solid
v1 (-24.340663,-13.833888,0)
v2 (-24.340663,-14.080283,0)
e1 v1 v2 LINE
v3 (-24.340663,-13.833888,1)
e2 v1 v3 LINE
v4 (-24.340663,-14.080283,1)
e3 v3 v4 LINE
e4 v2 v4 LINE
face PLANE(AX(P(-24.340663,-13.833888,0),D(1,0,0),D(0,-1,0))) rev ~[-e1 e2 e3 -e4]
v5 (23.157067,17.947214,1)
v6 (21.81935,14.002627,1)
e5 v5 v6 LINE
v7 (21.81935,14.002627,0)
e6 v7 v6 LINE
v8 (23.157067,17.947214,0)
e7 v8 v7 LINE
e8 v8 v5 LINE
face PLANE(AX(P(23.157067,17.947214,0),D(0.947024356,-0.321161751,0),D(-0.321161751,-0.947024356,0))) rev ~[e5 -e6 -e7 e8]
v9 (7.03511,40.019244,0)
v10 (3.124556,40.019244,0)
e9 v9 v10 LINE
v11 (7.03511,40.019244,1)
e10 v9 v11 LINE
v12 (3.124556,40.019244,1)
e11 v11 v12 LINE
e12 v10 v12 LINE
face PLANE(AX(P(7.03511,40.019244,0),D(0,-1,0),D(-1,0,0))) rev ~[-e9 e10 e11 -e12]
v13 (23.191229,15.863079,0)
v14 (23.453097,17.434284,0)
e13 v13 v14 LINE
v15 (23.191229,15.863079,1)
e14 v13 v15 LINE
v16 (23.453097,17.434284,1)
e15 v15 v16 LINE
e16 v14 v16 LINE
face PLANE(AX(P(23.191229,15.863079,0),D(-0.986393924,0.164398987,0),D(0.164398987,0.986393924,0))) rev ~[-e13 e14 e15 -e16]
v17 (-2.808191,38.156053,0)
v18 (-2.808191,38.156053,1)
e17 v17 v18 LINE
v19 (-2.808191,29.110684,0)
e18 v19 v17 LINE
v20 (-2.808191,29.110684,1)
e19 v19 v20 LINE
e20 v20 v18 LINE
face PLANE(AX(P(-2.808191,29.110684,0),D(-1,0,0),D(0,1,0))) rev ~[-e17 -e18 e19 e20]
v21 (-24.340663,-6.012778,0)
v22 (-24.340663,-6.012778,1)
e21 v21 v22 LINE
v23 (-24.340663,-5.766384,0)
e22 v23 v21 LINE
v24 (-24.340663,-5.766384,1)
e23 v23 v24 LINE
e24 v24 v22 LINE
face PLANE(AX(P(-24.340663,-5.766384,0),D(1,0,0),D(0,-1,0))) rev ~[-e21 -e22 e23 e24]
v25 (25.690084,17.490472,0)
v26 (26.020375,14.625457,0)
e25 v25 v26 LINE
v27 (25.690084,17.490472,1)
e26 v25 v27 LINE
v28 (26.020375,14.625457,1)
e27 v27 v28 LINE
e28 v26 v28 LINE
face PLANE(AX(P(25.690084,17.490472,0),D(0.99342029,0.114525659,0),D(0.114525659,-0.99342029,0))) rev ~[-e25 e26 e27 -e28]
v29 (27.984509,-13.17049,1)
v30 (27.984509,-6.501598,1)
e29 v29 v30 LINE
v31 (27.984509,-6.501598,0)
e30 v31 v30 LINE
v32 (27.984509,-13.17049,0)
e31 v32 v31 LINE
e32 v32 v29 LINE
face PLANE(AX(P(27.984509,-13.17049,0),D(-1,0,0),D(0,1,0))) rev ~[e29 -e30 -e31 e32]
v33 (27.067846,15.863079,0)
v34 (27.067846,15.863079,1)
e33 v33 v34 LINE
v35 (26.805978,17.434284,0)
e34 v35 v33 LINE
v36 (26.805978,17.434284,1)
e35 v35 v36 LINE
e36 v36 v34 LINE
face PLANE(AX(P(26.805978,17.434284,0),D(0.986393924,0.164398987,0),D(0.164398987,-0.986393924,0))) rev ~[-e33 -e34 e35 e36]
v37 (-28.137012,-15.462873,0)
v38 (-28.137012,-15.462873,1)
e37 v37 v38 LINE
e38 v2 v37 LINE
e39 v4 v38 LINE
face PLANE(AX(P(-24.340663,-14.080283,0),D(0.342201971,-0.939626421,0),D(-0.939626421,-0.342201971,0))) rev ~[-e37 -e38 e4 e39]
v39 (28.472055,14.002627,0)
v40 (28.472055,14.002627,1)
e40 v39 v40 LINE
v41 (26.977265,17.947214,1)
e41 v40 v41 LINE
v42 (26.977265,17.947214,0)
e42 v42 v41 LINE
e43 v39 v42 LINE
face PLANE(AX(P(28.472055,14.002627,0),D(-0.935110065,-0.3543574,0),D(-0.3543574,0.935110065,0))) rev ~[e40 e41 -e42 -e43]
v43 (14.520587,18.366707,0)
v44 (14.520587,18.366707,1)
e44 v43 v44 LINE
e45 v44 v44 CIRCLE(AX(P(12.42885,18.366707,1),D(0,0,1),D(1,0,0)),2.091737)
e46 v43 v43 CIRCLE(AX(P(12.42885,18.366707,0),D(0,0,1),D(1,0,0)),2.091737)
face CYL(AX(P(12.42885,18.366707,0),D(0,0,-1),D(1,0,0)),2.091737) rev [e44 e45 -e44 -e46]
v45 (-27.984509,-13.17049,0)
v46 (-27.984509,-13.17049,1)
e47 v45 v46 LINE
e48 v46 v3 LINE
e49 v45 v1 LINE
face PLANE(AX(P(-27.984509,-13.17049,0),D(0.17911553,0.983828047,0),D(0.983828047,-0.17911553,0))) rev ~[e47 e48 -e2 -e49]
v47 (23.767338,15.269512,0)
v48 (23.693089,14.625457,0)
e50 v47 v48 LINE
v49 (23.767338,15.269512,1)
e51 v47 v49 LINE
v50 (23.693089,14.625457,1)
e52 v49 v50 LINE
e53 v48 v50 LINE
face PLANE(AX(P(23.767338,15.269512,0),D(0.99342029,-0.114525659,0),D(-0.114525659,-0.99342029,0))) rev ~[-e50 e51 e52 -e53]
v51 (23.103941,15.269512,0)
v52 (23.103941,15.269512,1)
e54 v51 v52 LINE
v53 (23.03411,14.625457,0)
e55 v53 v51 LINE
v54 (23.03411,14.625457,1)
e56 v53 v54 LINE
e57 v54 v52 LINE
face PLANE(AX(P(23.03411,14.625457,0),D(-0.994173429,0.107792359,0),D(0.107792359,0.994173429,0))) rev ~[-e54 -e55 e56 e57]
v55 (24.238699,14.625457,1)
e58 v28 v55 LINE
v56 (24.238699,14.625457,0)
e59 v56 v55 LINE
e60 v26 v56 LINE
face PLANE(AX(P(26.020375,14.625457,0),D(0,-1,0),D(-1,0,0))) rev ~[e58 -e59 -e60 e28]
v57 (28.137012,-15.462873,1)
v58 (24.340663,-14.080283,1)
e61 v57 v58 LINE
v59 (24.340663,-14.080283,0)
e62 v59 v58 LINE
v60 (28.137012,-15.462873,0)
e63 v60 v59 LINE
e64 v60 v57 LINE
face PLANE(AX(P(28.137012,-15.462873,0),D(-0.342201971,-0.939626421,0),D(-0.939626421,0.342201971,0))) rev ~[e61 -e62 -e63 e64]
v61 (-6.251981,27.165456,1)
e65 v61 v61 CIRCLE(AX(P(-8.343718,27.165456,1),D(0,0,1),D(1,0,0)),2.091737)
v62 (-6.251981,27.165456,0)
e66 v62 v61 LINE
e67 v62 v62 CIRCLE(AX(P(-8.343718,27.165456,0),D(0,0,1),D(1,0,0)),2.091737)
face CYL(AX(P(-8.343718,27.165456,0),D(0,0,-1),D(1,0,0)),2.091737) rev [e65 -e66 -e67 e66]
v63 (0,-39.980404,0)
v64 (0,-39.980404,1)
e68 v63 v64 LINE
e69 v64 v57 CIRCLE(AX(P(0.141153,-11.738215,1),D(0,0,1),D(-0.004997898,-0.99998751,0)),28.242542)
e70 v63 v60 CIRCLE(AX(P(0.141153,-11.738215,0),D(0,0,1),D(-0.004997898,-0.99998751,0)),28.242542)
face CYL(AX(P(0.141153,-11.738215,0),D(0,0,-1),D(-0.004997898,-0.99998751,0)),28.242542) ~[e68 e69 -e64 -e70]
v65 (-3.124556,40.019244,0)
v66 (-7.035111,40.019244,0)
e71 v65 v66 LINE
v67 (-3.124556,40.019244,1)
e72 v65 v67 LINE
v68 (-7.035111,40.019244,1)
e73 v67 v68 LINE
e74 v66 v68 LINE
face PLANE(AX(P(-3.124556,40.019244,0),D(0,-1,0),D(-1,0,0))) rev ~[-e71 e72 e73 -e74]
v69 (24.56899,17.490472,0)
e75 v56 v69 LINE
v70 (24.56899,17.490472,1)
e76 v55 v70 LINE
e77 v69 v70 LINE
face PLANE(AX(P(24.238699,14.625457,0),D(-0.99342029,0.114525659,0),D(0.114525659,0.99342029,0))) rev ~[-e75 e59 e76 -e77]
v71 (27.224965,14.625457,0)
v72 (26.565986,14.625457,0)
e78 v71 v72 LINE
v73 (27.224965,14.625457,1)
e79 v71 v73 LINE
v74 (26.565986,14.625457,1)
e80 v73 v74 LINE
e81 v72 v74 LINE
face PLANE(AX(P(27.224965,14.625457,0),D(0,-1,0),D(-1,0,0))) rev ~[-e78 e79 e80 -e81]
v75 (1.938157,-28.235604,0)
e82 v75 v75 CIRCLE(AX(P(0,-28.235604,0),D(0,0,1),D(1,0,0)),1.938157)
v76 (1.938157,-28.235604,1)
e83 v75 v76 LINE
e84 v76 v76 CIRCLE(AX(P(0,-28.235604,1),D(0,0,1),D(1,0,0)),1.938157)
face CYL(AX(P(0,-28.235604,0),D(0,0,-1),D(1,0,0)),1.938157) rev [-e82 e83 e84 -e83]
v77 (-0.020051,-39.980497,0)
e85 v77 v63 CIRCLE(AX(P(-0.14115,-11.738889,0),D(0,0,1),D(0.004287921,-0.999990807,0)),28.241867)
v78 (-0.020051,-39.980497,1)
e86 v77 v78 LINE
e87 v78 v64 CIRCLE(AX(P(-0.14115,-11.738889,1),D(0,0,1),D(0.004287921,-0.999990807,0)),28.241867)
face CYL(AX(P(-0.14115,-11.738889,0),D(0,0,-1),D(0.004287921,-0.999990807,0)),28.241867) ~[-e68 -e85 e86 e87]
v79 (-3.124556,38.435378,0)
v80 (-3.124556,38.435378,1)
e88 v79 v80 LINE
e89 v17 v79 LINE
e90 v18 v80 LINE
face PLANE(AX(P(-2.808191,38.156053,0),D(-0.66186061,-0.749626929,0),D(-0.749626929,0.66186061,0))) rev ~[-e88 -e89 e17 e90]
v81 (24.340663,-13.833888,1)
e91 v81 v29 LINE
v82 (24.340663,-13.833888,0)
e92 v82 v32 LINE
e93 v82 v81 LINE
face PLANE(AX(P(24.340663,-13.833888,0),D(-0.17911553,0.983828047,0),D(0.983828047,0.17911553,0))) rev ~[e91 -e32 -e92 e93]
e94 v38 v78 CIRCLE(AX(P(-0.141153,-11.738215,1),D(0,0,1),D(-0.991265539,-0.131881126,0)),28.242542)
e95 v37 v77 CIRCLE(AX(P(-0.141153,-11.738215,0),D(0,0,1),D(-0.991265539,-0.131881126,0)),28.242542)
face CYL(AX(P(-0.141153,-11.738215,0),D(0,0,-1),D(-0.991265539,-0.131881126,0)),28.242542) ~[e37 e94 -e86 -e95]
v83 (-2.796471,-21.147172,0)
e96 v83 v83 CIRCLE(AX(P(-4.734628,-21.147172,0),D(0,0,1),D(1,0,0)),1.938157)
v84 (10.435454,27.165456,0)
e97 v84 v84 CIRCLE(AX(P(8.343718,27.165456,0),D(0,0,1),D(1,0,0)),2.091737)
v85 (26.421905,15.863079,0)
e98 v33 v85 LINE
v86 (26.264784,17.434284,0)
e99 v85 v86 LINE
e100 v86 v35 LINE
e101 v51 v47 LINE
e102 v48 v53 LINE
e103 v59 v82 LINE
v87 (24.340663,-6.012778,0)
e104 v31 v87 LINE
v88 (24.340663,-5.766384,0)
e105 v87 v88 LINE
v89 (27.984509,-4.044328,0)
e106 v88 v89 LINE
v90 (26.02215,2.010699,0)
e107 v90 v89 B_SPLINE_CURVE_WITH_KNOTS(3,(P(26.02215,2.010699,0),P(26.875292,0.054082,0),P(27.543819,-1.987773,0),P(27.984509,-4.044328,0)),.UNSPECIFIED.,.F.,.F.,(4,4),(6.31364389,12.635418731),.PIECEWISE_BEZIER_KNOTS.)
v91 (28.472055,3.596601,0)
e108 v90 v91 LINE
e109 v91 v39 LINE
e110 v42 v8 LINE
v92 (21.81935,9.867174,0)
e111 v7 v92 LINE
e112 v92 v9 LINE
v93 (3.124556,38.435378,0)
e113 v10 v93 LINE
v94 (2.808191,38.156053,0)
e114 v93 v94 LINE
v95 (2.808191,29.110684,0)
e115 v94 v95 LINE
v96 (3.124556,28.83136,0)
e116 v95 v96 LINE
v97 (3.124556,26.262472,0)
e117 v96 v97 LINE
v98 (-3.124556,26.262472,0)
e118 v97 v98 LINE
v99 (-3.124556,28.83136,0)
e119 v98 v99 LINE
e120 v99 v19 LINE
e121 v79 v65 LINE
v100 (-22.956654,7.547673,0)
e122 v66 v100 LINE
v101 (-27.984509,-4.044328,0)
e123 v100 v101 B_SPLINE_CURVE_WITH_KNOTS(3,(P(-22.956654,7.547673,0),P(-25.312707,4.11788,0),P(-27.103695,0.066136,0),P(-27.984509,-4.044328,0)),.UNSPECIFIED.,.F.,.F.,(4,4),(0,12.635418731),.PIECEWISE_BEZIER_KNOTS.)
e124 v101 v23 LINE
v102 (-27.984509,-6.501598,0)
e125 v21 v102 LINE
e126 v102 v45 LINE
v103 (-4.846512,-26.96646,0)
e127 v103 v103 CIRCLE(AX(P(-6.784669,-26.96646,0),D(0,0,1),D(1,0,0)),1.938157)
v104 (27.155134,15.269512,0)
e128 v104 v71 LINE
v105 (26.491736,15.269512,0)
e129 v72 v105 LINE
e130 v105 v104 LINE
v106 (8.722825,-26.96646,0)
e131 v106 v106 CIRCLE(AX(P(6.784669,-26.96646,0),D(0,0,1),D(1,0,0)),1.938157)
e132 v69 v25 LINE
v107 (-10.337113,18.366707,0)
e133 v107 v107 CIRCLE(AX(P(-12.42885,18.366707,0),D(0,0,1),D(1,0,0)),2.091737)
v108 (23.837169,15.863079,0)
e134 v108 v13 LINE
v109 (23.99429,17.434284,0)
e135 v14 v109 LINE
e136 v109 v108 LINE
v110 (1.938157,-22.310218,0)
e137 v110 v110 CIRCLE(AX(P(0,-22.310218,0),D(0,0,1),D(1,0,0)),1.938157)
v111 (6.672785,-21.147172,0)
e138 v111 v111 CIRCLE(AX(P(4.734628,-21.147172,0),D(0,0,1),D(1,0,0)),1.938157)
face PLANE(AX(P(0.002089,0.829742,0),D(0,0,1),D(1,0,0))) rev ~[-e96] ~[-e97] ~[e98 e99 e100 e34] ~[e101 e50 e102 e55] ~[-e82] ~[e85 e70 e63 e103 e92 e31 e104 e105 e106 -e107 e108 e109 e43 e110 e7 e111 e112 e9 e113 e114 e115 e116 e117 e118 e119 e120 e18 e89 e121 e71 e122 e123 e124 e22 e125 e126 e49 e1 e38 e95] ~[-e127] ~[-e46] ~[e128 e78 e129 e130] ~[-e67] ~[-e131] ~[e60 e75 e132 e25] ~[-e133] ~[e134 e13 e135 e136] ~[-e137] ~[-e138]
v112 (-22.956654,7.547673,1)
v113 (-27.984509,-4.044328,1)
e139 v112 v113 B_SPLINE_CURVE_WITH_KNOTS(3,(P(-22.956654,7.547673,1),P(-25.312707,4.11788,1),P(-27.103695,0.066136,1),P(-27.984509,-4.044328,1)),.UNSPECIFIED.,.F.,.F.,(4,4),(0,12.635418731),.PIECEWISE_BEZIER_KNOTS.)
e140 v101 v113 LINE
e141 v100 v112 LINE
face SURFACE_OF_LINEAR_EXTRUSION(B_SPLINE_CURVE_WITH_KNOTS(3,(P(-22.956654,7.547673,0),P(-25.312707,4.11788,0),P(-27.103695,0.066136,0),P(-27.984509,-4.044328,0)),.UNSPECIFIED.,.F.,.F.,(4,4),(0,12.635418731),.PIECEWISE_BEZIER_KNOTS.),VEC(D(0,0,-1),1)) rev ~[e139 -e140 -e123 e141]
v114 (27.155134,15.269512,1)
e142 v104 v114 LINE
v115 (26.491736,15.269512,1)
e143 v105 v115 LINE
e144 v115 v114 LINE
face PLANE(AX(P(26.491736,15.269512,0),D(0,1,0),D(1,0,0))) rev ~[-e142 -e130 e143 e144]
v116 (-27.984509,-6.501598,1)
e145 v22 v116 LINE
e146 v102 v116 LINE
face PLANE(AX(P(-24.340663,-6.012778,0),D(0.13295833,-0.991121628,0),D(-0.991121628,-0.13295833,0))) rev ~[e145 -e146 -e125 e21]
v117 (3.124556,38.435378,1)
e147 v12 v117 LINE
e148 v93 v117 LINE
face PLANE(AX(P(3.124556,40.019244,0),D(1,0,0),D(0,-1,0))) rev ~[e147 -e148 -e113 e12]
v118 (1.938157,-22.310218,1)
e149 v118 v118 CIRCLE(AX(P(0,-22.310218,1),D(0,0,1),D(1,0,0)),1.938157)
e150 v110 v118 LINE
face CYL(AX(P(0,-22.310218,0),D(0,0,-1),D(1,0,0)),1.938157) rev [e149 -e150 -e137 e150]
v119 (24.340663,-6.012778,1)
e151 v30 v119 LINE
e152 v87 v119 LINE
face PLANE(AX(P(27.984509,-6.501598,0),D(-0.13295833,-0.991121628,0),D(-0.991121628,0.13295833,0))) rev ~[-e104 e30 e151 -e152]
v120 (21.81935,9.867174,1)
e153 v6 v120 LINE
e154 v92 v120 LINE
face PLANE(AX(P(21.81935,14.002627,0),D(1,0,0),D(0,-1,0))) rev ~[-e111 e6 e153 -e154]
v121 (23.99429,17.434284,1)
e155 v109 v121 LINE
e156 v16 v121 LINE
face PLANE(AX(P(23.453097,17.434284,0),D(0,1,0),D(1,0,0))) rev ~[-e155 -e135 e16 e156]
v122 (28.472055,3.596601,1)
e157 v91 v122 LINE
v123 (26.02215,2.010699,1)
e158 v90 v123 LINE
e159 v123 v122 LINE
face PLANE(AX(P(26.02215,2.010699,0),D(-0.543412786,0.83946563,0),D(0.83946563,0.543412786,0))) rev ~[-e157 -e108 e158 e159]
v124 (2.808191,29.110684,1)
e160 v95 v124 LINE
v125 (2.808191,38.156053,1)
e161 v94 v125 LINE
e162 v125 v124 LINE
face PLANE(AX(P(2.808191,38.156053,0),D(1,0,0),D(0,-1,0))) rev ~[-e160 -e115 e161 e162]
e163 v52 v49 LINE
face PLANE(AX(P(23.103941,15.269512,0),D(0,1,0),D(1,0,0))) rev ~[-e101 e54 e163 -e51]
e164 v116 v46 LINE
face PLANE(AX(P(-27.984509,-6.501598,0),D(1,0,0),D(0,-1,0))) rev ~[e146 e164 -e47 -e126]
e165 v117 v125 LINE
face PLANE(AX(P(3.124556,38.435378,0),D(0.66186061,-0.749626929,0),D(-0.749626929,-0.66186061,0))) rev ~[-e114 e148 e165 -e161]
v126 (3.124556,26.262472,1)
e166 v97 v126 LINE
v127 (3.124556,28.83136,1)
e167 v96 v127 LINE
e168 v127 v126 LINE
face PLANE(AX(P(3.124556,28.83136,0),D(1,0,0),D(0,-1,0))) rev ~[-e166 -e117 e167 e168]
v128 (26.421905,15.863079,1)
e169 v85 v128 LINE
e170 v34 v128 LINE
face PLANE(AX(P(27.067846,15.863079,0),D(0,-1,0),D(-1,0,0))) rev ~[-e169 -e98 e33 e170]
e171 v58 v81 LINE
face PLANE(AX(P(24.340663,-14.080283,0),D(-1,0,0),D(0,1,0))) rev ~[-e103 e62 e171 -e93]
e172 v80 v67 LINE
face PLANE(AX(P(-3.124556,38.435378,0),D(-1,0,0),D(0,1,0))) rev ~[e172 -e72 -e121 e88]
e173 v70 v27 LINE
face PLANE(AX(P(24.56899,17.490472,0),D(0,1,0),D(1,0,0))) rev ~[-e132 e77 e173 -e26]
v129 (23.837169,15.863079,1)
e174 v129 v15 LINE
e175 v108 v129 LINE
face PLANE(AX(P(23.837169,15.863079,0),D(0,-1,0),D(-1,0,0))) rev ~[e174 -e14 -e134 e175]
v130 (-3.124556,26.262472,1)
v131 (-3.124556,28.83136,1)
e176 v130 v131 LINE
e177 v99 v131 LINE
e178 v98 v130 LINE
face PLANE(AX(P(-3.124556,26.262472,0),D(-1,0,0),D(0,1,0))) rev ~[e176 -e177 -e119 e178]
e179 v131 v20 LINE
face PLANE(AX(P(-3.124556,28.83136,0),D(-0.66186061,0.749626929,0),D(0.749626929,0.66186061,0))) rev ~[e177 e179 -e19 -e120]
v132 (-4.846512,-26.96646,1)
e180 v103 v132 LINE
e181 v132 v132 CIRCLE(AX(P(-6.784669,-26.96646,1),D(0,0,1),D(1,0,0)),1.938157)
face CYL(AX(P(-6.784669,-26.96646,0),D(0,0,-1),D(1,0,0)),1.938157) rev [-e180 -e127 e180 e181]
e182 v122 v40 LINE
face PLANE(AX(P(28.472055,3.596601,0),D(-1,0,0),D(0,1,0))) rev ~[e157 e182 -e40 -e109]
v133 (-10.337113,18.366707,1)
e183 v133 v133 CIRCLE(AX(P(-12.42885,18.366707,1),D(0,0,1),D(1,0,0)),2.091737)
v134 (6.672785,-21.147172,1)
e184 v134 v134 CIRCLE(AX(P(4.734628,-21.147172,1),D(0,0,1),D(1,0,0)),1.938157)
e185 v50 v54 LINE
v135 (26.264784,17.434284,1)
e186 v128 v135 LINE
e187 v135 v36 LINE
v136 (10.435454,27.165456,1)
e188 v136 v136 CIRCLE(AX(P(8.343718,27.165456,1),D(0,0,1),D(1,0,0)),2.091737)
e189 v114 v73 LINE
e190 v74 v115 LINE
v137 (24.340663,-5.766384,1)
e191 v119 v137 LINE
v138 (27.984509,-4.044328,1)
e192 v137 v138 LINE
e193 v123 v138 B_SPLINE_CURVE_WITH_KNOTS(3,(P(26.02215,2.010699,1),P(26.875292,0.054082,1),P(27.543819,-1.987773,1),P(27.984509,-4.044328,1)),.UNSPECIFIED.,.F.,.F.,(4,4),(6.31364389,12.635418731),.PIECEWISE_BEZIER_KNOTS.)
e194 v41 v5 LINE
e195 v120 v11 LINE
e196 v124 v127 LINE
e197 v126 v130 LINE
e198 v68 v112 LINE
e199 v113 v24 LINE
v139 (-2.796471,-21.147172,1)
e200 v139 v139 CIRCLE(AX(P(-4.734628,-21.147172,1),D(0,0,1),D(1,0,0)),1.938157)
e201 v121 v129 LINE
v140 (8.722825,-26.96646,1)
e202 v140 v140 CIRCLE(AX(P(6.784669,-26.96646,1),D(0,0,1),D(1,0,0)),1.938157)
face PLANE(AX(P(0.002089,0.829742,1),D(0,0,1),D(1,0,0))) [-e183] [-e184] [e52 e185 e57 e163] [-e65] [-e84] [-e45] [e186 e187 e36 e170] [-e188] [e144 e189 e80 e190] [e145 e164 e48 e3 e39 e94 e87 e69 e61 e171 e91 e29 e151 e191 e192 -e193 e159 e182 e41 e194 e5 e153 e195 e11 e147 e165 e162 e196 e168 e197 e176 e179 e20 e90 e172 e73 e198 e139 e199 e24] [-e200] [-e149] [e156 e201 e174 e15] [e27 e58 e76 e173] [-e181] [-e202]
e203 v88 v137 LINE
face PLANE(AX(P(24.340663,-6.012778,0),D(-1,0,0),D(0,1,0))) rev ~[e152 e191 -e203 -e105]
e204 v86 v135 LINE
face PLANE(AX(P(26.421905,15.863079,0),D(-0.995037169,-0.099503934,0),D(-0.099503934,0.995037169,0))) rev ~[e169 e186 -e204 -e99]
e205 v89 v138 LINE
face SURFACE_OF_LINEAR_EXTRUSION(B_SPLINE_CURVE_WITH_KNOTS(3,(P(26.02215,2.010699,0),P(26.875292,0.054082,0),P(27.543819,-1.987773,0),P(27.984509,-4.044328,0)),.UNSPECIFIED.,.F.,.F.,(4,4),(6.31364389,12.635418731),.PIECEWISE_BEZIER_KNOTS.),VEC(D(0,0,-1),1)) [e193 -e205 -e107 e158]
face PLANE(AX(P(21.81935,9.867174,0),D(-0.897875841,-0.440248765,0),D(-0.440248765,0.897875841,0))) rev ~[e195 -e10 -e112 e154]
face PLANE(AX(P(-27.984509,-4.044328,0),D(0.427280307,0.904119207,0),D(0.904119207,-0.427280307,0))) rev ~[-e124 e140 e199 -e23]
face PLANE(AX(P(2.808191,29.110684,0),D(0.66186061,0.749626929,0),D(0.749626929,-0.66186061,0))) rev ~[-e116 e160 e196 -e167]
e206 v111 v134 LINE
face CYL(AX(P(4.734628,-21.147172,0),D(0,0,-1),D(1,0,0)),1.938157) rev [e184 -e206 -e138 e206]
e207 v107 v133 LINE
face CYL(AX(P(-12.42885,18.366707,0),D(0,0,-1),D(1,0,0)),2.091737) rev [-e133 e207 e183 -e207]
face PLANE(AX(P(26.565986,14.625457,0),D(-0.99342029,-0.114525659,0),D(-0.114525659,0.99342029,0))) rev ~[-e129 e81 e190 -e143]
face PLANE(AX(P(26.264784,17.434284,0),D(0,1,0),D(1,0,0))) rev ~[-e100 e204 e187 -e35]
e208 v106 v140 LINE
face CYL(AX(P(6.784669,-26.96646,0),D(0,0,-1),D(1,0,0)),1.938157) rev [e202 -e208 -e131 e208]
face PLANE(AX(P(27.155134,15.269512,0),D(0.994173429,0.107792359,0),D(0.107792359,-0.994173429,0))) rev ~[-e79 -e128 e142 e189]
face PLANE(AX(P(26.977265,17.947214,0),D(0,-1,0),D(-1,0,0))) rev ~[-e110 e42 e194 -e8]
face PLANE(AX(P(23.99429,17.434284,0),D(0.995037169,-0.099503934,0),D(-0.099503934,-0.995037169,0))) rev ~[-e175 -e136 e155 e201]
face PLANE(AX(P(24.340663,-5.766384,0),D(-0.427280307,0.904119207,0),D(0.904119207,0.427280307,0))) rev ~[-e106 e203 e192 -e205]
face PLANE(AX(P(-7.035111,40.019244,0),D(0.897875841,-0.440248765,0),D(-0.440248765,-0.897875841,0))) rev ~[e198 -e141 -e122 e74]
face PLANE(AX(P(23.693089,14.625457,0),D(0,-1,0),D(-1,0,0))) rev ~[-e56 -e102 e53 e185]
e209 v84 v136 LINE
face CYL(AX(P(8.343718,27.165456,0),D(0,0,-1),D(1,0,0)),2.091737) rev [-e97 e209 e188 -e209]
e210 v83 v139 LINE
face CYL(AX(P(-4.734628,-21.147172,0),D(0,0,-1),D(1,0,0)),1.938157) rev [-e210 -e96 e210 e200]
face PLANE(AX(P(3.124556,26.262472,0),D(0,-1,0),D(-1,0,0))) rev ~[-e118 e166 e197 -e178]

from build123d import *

# Parameters (mm, degrees)
F0_R     = 1.9381566851
F0_R_2   = 2.0917368597
F1_DEPTH = 1


# Not quite as in the source:
# - a feature names something its author has since deleted; it is built from what else it names


with BuildPart() as f1:
    # F0 (on Top) → F1 (new body)
    with BuildSketch(Plane.XY):
        with BuildLine():
            Line((3.1245559464, 26.2624721611), (-1.08e-08, 26.2624721611))
            Line((-1.08e-08, 26.2624721611), (-3.124555968, 26.2624721611))
            Line((-3.124555968, 26.2624721611), (-3.124555968, 28.8313598976))
            Line((-3.124555968, 28.8313598976), (-3.124555968, 38.4353779081))
            Line((-3.124555968, 38.4353779081), (-3.124555968, 40.0192436593))
            Line((-3.124555968, 40.0192436593), (-7.0351105106, 40.0192436593))
            Line((-7.0351105106, 40.0192436593), (-22.9566536529, 7.5476728616))
            add(Edge.make_bspline(
                [(-22.9566536529, 7.5476728616), (-25.3127067939, 4.1178797379), (-27.103694983, 0.0661364302), (-27.9845091561, -4.0443276364)],
                knots=[0, 0, 0, 0, 12.635418731, 12.635418731, 12.635418731, 12.635418731], degree=3))
            Line((-27.9845091561, -4.0443276364), (-24.3406626732, -5.7663835679))
            Line((-24.3406626732, -5.7663835679), (-24.3406626732, -6.0127781864))
            Line((-24.3406626732, -6.0127781864), (-27.9845091561, -6.501597853))
            Line((-27.9845091561, -6.501597853), (-27.9845091561, -13.1704901951))
            Line((-27.9845091561, -13.1704901951), (-24.3406626732, -13.83388813))
            Line((-24.3406626732, -13.83388813), (-24.3406626732, -14.0802827486))
            Line((-24.3406626732, -14.0802827486), (-28.1370117447, -15.4628727929))
            ThreePointArc((-28.1370117447, -15.4628727929), (-18.7026452725, -33.0246464869), (-0.0200514, -39.9804967013))
            ThreePointArc((-0.0200514, -39.9804967013), (-0.0100256971, -39.9804519319), (-1.08e-08, -39.9804036034))
            ThreePointArc((-1.08e-08, -39.9804036034), (18.6950876239, -33.0312342783), (28.1370117231, -15.4628727929))
            Line((28.1370117231, -15.4628727929), (24.3406626516, -14.0802827486))
            Line((24.3406626516, -14.0802827486), (24.3406626516, -13.8338881301))
            Line((24.3406626516, -13.8338881301), (27.9845091345, -13.1704901951))
            Line((27.9845091345, -13.1704901951), (27.9845091345, -6.501597853))
            Line((27.9845091345, -6.501597853), (24.3406626516, -6.0127781865))
            Line((24.3406626516, -6.0127781865), (24.3406626516, -5.7663835679))
            Line((24.3406626516, -5.7663835679), (27.9845091345, -4.0443276364))
            add(Edge.make_bspline(
                [(26.0221502825, 2.0106991689), (26.8752917045, 0.0540824437), (27.5438186439, -1.9877730517), (27.9845091345, -4.0443276364)],
                knots=[6.3136438899, 6.3136438899, 6.3136438899, 6.3136438899, 12.635418731, 12.635418731, 12.635418731, 12.635418731], degree=3))
            add(Edge.make_bspline(
                [(22.9566536312, 7.5476728616), (24.1339221361, 5.8338798437), (25.1701061555, 3.9647993294), (26.0221502825, 2.0106991689)],
                knots=[0, 0, 0, 0, 6.3136438899, 6.3136438899, 6.3136438899, 6.3136438899], degree=3))
            Line((22.9566536312, 7.5476728616), (21.8193497392, 9.8671744024))
            Line((21.8193497392, 9.8671744024), (7.035110489, 40.0192436593))
            Line((7.035110489, 40.0192436593), (3.1245559464, 40.0192436593))
            Line((3.1245559464, 40.0192436593), (3.1245559464, 38.4353779081))
            Line((3.1245559464, 38.4353779081), (3.1245559464, 28.8313598976))
            Line((3.1245559464, 28.8313598976), (3.1245559464, 26.2624721611))
        make_face()
        with Locations((-6.7846685267, -26.966459513)):
            Circle(F0_R, mode=Mode.SUBTRACT)
        with Locations((-1.08e-08, -28.2356044358)):
            Circle(F0_R, mode=Mode.SUBTRACT)
        with Locations((-4.7346279243, -21.1471724542)):
            Circle(F0_R, mode=Mode.SUBTRACT)
        with Locations((-1.08e-08, -22.3102177961)):
            Circle(F0_R, mode=Mode.SUBTRACT)
        with Locations((6.784668505, -26.966459513)):
            Circle(F0_R, mode=Mode.SUBTRACT)
        with Locations((4.7346279027, -21.1471724542)):
            Circle(F0_R, mode=Mode.SUBTRACT)
        with Locations((-12.4288502443, 18.366707164)):
            Circle(F0_R_2, mode=Mode.SUBTRACT)
        with Locations((-8.3437176479, 27.1654560115)):
            Circle(F0_R_2, mode=Mode.SUBTRACT)
        with Locations((12.4288502227, 18.366707164)):
            Circle(F0_R_2, mode=Mode.SUBTRACT)
        with Locations((8.3437176263, 27.1654560115)):
            Circle(F0_R_2, mode=Mode.SUBTRACT)
        with BuildLine():
            Line((21.8193497392, 14.0026268734), (21.8193497392, 9.8671744024))
            Line((21.8193497392, 9.8671744024), (22.9566536312, 7.5476728616))
            add(Edge.make_bspline(
                [(22.9566536312, 7.5476728616), (24.1339221361, 5.8338798437), (25.1701061555, 3.9647993294), (26.0221502825, 2.0106991689)],
                knots=[0, 0, 0, 0, 6.3136438899, 6.3136438899, 6.3136438899, 6.3136438899], degree=3))
            Line((26.0221502825, 2.0106991689), (28.4720553036, 3.5966005617))
            Line((28.4720553036, 3.5966005617), (28.4720553036, 14.0026268734))
            Line((28.4720553036, 14.0026268734), (26.9772648538, 17.9472138793))
            Line((26.9772648538, 17.9472138793), (23.1570666214, 17.9472138793))
            Line((23.1570666214, 17.9472138793), (21.8193497392, 14.0026268734))
        make_face()
        Polygon((23.0341097003, 14.6254569428), (23.103940836, 15.2695124223), (23.7673383417, 15.2695124223), (23.6930889239, 14.6254569428), align=None, mode=Mode.SUBTRACT)
        Polygon((27.2249650291, 14.6254569428), (26.5659858056, 14.6254569428), (26.4917363877, 15.2695124223), (27.1551338935, 15.2695124223), align=None, mode=Mode.SUBTRACT)
        Polygon((23.1912288972, 15.8630787924), (23.4530965144, 17.4342844956), (23.9942903911, 17.4342844956), (23.8371694774, 15.8630787924), align=None, mode=Mode.SUBTRACT)
        Polygon((24.238699366, 14.6254569428), (24.5689903023, 17.4904718284), (25.6900844272, 17.4904718284), (26.0203753635, 14.6254569428), align=None, mode=Mode.SUBTRACT)
        Polygon((27.0678458323, 15.8630787924), (26.4219052521, 15.8630787924), (26.2647843384, 17.4342844956), (26.8059782151, 17.4342844956), align=None, mode=Mode.SUBTRACT)
        Polygon((-3.124555968, 38.4353779081), (-3.124555968, 28.8313598976), (-2.8081914709, 29.1106844403), (-2.8081914709, 38.1560533654), align=None)
        Polygon((2.8081914492, 29.1106844403), (3.1245559464, 28.8313598976), (3.1245559464, 38.4353779081), (2.8081914492, 38.1560533654), align=None)
    extrude(amount=F1_DEPTH)


solid = f1.part
